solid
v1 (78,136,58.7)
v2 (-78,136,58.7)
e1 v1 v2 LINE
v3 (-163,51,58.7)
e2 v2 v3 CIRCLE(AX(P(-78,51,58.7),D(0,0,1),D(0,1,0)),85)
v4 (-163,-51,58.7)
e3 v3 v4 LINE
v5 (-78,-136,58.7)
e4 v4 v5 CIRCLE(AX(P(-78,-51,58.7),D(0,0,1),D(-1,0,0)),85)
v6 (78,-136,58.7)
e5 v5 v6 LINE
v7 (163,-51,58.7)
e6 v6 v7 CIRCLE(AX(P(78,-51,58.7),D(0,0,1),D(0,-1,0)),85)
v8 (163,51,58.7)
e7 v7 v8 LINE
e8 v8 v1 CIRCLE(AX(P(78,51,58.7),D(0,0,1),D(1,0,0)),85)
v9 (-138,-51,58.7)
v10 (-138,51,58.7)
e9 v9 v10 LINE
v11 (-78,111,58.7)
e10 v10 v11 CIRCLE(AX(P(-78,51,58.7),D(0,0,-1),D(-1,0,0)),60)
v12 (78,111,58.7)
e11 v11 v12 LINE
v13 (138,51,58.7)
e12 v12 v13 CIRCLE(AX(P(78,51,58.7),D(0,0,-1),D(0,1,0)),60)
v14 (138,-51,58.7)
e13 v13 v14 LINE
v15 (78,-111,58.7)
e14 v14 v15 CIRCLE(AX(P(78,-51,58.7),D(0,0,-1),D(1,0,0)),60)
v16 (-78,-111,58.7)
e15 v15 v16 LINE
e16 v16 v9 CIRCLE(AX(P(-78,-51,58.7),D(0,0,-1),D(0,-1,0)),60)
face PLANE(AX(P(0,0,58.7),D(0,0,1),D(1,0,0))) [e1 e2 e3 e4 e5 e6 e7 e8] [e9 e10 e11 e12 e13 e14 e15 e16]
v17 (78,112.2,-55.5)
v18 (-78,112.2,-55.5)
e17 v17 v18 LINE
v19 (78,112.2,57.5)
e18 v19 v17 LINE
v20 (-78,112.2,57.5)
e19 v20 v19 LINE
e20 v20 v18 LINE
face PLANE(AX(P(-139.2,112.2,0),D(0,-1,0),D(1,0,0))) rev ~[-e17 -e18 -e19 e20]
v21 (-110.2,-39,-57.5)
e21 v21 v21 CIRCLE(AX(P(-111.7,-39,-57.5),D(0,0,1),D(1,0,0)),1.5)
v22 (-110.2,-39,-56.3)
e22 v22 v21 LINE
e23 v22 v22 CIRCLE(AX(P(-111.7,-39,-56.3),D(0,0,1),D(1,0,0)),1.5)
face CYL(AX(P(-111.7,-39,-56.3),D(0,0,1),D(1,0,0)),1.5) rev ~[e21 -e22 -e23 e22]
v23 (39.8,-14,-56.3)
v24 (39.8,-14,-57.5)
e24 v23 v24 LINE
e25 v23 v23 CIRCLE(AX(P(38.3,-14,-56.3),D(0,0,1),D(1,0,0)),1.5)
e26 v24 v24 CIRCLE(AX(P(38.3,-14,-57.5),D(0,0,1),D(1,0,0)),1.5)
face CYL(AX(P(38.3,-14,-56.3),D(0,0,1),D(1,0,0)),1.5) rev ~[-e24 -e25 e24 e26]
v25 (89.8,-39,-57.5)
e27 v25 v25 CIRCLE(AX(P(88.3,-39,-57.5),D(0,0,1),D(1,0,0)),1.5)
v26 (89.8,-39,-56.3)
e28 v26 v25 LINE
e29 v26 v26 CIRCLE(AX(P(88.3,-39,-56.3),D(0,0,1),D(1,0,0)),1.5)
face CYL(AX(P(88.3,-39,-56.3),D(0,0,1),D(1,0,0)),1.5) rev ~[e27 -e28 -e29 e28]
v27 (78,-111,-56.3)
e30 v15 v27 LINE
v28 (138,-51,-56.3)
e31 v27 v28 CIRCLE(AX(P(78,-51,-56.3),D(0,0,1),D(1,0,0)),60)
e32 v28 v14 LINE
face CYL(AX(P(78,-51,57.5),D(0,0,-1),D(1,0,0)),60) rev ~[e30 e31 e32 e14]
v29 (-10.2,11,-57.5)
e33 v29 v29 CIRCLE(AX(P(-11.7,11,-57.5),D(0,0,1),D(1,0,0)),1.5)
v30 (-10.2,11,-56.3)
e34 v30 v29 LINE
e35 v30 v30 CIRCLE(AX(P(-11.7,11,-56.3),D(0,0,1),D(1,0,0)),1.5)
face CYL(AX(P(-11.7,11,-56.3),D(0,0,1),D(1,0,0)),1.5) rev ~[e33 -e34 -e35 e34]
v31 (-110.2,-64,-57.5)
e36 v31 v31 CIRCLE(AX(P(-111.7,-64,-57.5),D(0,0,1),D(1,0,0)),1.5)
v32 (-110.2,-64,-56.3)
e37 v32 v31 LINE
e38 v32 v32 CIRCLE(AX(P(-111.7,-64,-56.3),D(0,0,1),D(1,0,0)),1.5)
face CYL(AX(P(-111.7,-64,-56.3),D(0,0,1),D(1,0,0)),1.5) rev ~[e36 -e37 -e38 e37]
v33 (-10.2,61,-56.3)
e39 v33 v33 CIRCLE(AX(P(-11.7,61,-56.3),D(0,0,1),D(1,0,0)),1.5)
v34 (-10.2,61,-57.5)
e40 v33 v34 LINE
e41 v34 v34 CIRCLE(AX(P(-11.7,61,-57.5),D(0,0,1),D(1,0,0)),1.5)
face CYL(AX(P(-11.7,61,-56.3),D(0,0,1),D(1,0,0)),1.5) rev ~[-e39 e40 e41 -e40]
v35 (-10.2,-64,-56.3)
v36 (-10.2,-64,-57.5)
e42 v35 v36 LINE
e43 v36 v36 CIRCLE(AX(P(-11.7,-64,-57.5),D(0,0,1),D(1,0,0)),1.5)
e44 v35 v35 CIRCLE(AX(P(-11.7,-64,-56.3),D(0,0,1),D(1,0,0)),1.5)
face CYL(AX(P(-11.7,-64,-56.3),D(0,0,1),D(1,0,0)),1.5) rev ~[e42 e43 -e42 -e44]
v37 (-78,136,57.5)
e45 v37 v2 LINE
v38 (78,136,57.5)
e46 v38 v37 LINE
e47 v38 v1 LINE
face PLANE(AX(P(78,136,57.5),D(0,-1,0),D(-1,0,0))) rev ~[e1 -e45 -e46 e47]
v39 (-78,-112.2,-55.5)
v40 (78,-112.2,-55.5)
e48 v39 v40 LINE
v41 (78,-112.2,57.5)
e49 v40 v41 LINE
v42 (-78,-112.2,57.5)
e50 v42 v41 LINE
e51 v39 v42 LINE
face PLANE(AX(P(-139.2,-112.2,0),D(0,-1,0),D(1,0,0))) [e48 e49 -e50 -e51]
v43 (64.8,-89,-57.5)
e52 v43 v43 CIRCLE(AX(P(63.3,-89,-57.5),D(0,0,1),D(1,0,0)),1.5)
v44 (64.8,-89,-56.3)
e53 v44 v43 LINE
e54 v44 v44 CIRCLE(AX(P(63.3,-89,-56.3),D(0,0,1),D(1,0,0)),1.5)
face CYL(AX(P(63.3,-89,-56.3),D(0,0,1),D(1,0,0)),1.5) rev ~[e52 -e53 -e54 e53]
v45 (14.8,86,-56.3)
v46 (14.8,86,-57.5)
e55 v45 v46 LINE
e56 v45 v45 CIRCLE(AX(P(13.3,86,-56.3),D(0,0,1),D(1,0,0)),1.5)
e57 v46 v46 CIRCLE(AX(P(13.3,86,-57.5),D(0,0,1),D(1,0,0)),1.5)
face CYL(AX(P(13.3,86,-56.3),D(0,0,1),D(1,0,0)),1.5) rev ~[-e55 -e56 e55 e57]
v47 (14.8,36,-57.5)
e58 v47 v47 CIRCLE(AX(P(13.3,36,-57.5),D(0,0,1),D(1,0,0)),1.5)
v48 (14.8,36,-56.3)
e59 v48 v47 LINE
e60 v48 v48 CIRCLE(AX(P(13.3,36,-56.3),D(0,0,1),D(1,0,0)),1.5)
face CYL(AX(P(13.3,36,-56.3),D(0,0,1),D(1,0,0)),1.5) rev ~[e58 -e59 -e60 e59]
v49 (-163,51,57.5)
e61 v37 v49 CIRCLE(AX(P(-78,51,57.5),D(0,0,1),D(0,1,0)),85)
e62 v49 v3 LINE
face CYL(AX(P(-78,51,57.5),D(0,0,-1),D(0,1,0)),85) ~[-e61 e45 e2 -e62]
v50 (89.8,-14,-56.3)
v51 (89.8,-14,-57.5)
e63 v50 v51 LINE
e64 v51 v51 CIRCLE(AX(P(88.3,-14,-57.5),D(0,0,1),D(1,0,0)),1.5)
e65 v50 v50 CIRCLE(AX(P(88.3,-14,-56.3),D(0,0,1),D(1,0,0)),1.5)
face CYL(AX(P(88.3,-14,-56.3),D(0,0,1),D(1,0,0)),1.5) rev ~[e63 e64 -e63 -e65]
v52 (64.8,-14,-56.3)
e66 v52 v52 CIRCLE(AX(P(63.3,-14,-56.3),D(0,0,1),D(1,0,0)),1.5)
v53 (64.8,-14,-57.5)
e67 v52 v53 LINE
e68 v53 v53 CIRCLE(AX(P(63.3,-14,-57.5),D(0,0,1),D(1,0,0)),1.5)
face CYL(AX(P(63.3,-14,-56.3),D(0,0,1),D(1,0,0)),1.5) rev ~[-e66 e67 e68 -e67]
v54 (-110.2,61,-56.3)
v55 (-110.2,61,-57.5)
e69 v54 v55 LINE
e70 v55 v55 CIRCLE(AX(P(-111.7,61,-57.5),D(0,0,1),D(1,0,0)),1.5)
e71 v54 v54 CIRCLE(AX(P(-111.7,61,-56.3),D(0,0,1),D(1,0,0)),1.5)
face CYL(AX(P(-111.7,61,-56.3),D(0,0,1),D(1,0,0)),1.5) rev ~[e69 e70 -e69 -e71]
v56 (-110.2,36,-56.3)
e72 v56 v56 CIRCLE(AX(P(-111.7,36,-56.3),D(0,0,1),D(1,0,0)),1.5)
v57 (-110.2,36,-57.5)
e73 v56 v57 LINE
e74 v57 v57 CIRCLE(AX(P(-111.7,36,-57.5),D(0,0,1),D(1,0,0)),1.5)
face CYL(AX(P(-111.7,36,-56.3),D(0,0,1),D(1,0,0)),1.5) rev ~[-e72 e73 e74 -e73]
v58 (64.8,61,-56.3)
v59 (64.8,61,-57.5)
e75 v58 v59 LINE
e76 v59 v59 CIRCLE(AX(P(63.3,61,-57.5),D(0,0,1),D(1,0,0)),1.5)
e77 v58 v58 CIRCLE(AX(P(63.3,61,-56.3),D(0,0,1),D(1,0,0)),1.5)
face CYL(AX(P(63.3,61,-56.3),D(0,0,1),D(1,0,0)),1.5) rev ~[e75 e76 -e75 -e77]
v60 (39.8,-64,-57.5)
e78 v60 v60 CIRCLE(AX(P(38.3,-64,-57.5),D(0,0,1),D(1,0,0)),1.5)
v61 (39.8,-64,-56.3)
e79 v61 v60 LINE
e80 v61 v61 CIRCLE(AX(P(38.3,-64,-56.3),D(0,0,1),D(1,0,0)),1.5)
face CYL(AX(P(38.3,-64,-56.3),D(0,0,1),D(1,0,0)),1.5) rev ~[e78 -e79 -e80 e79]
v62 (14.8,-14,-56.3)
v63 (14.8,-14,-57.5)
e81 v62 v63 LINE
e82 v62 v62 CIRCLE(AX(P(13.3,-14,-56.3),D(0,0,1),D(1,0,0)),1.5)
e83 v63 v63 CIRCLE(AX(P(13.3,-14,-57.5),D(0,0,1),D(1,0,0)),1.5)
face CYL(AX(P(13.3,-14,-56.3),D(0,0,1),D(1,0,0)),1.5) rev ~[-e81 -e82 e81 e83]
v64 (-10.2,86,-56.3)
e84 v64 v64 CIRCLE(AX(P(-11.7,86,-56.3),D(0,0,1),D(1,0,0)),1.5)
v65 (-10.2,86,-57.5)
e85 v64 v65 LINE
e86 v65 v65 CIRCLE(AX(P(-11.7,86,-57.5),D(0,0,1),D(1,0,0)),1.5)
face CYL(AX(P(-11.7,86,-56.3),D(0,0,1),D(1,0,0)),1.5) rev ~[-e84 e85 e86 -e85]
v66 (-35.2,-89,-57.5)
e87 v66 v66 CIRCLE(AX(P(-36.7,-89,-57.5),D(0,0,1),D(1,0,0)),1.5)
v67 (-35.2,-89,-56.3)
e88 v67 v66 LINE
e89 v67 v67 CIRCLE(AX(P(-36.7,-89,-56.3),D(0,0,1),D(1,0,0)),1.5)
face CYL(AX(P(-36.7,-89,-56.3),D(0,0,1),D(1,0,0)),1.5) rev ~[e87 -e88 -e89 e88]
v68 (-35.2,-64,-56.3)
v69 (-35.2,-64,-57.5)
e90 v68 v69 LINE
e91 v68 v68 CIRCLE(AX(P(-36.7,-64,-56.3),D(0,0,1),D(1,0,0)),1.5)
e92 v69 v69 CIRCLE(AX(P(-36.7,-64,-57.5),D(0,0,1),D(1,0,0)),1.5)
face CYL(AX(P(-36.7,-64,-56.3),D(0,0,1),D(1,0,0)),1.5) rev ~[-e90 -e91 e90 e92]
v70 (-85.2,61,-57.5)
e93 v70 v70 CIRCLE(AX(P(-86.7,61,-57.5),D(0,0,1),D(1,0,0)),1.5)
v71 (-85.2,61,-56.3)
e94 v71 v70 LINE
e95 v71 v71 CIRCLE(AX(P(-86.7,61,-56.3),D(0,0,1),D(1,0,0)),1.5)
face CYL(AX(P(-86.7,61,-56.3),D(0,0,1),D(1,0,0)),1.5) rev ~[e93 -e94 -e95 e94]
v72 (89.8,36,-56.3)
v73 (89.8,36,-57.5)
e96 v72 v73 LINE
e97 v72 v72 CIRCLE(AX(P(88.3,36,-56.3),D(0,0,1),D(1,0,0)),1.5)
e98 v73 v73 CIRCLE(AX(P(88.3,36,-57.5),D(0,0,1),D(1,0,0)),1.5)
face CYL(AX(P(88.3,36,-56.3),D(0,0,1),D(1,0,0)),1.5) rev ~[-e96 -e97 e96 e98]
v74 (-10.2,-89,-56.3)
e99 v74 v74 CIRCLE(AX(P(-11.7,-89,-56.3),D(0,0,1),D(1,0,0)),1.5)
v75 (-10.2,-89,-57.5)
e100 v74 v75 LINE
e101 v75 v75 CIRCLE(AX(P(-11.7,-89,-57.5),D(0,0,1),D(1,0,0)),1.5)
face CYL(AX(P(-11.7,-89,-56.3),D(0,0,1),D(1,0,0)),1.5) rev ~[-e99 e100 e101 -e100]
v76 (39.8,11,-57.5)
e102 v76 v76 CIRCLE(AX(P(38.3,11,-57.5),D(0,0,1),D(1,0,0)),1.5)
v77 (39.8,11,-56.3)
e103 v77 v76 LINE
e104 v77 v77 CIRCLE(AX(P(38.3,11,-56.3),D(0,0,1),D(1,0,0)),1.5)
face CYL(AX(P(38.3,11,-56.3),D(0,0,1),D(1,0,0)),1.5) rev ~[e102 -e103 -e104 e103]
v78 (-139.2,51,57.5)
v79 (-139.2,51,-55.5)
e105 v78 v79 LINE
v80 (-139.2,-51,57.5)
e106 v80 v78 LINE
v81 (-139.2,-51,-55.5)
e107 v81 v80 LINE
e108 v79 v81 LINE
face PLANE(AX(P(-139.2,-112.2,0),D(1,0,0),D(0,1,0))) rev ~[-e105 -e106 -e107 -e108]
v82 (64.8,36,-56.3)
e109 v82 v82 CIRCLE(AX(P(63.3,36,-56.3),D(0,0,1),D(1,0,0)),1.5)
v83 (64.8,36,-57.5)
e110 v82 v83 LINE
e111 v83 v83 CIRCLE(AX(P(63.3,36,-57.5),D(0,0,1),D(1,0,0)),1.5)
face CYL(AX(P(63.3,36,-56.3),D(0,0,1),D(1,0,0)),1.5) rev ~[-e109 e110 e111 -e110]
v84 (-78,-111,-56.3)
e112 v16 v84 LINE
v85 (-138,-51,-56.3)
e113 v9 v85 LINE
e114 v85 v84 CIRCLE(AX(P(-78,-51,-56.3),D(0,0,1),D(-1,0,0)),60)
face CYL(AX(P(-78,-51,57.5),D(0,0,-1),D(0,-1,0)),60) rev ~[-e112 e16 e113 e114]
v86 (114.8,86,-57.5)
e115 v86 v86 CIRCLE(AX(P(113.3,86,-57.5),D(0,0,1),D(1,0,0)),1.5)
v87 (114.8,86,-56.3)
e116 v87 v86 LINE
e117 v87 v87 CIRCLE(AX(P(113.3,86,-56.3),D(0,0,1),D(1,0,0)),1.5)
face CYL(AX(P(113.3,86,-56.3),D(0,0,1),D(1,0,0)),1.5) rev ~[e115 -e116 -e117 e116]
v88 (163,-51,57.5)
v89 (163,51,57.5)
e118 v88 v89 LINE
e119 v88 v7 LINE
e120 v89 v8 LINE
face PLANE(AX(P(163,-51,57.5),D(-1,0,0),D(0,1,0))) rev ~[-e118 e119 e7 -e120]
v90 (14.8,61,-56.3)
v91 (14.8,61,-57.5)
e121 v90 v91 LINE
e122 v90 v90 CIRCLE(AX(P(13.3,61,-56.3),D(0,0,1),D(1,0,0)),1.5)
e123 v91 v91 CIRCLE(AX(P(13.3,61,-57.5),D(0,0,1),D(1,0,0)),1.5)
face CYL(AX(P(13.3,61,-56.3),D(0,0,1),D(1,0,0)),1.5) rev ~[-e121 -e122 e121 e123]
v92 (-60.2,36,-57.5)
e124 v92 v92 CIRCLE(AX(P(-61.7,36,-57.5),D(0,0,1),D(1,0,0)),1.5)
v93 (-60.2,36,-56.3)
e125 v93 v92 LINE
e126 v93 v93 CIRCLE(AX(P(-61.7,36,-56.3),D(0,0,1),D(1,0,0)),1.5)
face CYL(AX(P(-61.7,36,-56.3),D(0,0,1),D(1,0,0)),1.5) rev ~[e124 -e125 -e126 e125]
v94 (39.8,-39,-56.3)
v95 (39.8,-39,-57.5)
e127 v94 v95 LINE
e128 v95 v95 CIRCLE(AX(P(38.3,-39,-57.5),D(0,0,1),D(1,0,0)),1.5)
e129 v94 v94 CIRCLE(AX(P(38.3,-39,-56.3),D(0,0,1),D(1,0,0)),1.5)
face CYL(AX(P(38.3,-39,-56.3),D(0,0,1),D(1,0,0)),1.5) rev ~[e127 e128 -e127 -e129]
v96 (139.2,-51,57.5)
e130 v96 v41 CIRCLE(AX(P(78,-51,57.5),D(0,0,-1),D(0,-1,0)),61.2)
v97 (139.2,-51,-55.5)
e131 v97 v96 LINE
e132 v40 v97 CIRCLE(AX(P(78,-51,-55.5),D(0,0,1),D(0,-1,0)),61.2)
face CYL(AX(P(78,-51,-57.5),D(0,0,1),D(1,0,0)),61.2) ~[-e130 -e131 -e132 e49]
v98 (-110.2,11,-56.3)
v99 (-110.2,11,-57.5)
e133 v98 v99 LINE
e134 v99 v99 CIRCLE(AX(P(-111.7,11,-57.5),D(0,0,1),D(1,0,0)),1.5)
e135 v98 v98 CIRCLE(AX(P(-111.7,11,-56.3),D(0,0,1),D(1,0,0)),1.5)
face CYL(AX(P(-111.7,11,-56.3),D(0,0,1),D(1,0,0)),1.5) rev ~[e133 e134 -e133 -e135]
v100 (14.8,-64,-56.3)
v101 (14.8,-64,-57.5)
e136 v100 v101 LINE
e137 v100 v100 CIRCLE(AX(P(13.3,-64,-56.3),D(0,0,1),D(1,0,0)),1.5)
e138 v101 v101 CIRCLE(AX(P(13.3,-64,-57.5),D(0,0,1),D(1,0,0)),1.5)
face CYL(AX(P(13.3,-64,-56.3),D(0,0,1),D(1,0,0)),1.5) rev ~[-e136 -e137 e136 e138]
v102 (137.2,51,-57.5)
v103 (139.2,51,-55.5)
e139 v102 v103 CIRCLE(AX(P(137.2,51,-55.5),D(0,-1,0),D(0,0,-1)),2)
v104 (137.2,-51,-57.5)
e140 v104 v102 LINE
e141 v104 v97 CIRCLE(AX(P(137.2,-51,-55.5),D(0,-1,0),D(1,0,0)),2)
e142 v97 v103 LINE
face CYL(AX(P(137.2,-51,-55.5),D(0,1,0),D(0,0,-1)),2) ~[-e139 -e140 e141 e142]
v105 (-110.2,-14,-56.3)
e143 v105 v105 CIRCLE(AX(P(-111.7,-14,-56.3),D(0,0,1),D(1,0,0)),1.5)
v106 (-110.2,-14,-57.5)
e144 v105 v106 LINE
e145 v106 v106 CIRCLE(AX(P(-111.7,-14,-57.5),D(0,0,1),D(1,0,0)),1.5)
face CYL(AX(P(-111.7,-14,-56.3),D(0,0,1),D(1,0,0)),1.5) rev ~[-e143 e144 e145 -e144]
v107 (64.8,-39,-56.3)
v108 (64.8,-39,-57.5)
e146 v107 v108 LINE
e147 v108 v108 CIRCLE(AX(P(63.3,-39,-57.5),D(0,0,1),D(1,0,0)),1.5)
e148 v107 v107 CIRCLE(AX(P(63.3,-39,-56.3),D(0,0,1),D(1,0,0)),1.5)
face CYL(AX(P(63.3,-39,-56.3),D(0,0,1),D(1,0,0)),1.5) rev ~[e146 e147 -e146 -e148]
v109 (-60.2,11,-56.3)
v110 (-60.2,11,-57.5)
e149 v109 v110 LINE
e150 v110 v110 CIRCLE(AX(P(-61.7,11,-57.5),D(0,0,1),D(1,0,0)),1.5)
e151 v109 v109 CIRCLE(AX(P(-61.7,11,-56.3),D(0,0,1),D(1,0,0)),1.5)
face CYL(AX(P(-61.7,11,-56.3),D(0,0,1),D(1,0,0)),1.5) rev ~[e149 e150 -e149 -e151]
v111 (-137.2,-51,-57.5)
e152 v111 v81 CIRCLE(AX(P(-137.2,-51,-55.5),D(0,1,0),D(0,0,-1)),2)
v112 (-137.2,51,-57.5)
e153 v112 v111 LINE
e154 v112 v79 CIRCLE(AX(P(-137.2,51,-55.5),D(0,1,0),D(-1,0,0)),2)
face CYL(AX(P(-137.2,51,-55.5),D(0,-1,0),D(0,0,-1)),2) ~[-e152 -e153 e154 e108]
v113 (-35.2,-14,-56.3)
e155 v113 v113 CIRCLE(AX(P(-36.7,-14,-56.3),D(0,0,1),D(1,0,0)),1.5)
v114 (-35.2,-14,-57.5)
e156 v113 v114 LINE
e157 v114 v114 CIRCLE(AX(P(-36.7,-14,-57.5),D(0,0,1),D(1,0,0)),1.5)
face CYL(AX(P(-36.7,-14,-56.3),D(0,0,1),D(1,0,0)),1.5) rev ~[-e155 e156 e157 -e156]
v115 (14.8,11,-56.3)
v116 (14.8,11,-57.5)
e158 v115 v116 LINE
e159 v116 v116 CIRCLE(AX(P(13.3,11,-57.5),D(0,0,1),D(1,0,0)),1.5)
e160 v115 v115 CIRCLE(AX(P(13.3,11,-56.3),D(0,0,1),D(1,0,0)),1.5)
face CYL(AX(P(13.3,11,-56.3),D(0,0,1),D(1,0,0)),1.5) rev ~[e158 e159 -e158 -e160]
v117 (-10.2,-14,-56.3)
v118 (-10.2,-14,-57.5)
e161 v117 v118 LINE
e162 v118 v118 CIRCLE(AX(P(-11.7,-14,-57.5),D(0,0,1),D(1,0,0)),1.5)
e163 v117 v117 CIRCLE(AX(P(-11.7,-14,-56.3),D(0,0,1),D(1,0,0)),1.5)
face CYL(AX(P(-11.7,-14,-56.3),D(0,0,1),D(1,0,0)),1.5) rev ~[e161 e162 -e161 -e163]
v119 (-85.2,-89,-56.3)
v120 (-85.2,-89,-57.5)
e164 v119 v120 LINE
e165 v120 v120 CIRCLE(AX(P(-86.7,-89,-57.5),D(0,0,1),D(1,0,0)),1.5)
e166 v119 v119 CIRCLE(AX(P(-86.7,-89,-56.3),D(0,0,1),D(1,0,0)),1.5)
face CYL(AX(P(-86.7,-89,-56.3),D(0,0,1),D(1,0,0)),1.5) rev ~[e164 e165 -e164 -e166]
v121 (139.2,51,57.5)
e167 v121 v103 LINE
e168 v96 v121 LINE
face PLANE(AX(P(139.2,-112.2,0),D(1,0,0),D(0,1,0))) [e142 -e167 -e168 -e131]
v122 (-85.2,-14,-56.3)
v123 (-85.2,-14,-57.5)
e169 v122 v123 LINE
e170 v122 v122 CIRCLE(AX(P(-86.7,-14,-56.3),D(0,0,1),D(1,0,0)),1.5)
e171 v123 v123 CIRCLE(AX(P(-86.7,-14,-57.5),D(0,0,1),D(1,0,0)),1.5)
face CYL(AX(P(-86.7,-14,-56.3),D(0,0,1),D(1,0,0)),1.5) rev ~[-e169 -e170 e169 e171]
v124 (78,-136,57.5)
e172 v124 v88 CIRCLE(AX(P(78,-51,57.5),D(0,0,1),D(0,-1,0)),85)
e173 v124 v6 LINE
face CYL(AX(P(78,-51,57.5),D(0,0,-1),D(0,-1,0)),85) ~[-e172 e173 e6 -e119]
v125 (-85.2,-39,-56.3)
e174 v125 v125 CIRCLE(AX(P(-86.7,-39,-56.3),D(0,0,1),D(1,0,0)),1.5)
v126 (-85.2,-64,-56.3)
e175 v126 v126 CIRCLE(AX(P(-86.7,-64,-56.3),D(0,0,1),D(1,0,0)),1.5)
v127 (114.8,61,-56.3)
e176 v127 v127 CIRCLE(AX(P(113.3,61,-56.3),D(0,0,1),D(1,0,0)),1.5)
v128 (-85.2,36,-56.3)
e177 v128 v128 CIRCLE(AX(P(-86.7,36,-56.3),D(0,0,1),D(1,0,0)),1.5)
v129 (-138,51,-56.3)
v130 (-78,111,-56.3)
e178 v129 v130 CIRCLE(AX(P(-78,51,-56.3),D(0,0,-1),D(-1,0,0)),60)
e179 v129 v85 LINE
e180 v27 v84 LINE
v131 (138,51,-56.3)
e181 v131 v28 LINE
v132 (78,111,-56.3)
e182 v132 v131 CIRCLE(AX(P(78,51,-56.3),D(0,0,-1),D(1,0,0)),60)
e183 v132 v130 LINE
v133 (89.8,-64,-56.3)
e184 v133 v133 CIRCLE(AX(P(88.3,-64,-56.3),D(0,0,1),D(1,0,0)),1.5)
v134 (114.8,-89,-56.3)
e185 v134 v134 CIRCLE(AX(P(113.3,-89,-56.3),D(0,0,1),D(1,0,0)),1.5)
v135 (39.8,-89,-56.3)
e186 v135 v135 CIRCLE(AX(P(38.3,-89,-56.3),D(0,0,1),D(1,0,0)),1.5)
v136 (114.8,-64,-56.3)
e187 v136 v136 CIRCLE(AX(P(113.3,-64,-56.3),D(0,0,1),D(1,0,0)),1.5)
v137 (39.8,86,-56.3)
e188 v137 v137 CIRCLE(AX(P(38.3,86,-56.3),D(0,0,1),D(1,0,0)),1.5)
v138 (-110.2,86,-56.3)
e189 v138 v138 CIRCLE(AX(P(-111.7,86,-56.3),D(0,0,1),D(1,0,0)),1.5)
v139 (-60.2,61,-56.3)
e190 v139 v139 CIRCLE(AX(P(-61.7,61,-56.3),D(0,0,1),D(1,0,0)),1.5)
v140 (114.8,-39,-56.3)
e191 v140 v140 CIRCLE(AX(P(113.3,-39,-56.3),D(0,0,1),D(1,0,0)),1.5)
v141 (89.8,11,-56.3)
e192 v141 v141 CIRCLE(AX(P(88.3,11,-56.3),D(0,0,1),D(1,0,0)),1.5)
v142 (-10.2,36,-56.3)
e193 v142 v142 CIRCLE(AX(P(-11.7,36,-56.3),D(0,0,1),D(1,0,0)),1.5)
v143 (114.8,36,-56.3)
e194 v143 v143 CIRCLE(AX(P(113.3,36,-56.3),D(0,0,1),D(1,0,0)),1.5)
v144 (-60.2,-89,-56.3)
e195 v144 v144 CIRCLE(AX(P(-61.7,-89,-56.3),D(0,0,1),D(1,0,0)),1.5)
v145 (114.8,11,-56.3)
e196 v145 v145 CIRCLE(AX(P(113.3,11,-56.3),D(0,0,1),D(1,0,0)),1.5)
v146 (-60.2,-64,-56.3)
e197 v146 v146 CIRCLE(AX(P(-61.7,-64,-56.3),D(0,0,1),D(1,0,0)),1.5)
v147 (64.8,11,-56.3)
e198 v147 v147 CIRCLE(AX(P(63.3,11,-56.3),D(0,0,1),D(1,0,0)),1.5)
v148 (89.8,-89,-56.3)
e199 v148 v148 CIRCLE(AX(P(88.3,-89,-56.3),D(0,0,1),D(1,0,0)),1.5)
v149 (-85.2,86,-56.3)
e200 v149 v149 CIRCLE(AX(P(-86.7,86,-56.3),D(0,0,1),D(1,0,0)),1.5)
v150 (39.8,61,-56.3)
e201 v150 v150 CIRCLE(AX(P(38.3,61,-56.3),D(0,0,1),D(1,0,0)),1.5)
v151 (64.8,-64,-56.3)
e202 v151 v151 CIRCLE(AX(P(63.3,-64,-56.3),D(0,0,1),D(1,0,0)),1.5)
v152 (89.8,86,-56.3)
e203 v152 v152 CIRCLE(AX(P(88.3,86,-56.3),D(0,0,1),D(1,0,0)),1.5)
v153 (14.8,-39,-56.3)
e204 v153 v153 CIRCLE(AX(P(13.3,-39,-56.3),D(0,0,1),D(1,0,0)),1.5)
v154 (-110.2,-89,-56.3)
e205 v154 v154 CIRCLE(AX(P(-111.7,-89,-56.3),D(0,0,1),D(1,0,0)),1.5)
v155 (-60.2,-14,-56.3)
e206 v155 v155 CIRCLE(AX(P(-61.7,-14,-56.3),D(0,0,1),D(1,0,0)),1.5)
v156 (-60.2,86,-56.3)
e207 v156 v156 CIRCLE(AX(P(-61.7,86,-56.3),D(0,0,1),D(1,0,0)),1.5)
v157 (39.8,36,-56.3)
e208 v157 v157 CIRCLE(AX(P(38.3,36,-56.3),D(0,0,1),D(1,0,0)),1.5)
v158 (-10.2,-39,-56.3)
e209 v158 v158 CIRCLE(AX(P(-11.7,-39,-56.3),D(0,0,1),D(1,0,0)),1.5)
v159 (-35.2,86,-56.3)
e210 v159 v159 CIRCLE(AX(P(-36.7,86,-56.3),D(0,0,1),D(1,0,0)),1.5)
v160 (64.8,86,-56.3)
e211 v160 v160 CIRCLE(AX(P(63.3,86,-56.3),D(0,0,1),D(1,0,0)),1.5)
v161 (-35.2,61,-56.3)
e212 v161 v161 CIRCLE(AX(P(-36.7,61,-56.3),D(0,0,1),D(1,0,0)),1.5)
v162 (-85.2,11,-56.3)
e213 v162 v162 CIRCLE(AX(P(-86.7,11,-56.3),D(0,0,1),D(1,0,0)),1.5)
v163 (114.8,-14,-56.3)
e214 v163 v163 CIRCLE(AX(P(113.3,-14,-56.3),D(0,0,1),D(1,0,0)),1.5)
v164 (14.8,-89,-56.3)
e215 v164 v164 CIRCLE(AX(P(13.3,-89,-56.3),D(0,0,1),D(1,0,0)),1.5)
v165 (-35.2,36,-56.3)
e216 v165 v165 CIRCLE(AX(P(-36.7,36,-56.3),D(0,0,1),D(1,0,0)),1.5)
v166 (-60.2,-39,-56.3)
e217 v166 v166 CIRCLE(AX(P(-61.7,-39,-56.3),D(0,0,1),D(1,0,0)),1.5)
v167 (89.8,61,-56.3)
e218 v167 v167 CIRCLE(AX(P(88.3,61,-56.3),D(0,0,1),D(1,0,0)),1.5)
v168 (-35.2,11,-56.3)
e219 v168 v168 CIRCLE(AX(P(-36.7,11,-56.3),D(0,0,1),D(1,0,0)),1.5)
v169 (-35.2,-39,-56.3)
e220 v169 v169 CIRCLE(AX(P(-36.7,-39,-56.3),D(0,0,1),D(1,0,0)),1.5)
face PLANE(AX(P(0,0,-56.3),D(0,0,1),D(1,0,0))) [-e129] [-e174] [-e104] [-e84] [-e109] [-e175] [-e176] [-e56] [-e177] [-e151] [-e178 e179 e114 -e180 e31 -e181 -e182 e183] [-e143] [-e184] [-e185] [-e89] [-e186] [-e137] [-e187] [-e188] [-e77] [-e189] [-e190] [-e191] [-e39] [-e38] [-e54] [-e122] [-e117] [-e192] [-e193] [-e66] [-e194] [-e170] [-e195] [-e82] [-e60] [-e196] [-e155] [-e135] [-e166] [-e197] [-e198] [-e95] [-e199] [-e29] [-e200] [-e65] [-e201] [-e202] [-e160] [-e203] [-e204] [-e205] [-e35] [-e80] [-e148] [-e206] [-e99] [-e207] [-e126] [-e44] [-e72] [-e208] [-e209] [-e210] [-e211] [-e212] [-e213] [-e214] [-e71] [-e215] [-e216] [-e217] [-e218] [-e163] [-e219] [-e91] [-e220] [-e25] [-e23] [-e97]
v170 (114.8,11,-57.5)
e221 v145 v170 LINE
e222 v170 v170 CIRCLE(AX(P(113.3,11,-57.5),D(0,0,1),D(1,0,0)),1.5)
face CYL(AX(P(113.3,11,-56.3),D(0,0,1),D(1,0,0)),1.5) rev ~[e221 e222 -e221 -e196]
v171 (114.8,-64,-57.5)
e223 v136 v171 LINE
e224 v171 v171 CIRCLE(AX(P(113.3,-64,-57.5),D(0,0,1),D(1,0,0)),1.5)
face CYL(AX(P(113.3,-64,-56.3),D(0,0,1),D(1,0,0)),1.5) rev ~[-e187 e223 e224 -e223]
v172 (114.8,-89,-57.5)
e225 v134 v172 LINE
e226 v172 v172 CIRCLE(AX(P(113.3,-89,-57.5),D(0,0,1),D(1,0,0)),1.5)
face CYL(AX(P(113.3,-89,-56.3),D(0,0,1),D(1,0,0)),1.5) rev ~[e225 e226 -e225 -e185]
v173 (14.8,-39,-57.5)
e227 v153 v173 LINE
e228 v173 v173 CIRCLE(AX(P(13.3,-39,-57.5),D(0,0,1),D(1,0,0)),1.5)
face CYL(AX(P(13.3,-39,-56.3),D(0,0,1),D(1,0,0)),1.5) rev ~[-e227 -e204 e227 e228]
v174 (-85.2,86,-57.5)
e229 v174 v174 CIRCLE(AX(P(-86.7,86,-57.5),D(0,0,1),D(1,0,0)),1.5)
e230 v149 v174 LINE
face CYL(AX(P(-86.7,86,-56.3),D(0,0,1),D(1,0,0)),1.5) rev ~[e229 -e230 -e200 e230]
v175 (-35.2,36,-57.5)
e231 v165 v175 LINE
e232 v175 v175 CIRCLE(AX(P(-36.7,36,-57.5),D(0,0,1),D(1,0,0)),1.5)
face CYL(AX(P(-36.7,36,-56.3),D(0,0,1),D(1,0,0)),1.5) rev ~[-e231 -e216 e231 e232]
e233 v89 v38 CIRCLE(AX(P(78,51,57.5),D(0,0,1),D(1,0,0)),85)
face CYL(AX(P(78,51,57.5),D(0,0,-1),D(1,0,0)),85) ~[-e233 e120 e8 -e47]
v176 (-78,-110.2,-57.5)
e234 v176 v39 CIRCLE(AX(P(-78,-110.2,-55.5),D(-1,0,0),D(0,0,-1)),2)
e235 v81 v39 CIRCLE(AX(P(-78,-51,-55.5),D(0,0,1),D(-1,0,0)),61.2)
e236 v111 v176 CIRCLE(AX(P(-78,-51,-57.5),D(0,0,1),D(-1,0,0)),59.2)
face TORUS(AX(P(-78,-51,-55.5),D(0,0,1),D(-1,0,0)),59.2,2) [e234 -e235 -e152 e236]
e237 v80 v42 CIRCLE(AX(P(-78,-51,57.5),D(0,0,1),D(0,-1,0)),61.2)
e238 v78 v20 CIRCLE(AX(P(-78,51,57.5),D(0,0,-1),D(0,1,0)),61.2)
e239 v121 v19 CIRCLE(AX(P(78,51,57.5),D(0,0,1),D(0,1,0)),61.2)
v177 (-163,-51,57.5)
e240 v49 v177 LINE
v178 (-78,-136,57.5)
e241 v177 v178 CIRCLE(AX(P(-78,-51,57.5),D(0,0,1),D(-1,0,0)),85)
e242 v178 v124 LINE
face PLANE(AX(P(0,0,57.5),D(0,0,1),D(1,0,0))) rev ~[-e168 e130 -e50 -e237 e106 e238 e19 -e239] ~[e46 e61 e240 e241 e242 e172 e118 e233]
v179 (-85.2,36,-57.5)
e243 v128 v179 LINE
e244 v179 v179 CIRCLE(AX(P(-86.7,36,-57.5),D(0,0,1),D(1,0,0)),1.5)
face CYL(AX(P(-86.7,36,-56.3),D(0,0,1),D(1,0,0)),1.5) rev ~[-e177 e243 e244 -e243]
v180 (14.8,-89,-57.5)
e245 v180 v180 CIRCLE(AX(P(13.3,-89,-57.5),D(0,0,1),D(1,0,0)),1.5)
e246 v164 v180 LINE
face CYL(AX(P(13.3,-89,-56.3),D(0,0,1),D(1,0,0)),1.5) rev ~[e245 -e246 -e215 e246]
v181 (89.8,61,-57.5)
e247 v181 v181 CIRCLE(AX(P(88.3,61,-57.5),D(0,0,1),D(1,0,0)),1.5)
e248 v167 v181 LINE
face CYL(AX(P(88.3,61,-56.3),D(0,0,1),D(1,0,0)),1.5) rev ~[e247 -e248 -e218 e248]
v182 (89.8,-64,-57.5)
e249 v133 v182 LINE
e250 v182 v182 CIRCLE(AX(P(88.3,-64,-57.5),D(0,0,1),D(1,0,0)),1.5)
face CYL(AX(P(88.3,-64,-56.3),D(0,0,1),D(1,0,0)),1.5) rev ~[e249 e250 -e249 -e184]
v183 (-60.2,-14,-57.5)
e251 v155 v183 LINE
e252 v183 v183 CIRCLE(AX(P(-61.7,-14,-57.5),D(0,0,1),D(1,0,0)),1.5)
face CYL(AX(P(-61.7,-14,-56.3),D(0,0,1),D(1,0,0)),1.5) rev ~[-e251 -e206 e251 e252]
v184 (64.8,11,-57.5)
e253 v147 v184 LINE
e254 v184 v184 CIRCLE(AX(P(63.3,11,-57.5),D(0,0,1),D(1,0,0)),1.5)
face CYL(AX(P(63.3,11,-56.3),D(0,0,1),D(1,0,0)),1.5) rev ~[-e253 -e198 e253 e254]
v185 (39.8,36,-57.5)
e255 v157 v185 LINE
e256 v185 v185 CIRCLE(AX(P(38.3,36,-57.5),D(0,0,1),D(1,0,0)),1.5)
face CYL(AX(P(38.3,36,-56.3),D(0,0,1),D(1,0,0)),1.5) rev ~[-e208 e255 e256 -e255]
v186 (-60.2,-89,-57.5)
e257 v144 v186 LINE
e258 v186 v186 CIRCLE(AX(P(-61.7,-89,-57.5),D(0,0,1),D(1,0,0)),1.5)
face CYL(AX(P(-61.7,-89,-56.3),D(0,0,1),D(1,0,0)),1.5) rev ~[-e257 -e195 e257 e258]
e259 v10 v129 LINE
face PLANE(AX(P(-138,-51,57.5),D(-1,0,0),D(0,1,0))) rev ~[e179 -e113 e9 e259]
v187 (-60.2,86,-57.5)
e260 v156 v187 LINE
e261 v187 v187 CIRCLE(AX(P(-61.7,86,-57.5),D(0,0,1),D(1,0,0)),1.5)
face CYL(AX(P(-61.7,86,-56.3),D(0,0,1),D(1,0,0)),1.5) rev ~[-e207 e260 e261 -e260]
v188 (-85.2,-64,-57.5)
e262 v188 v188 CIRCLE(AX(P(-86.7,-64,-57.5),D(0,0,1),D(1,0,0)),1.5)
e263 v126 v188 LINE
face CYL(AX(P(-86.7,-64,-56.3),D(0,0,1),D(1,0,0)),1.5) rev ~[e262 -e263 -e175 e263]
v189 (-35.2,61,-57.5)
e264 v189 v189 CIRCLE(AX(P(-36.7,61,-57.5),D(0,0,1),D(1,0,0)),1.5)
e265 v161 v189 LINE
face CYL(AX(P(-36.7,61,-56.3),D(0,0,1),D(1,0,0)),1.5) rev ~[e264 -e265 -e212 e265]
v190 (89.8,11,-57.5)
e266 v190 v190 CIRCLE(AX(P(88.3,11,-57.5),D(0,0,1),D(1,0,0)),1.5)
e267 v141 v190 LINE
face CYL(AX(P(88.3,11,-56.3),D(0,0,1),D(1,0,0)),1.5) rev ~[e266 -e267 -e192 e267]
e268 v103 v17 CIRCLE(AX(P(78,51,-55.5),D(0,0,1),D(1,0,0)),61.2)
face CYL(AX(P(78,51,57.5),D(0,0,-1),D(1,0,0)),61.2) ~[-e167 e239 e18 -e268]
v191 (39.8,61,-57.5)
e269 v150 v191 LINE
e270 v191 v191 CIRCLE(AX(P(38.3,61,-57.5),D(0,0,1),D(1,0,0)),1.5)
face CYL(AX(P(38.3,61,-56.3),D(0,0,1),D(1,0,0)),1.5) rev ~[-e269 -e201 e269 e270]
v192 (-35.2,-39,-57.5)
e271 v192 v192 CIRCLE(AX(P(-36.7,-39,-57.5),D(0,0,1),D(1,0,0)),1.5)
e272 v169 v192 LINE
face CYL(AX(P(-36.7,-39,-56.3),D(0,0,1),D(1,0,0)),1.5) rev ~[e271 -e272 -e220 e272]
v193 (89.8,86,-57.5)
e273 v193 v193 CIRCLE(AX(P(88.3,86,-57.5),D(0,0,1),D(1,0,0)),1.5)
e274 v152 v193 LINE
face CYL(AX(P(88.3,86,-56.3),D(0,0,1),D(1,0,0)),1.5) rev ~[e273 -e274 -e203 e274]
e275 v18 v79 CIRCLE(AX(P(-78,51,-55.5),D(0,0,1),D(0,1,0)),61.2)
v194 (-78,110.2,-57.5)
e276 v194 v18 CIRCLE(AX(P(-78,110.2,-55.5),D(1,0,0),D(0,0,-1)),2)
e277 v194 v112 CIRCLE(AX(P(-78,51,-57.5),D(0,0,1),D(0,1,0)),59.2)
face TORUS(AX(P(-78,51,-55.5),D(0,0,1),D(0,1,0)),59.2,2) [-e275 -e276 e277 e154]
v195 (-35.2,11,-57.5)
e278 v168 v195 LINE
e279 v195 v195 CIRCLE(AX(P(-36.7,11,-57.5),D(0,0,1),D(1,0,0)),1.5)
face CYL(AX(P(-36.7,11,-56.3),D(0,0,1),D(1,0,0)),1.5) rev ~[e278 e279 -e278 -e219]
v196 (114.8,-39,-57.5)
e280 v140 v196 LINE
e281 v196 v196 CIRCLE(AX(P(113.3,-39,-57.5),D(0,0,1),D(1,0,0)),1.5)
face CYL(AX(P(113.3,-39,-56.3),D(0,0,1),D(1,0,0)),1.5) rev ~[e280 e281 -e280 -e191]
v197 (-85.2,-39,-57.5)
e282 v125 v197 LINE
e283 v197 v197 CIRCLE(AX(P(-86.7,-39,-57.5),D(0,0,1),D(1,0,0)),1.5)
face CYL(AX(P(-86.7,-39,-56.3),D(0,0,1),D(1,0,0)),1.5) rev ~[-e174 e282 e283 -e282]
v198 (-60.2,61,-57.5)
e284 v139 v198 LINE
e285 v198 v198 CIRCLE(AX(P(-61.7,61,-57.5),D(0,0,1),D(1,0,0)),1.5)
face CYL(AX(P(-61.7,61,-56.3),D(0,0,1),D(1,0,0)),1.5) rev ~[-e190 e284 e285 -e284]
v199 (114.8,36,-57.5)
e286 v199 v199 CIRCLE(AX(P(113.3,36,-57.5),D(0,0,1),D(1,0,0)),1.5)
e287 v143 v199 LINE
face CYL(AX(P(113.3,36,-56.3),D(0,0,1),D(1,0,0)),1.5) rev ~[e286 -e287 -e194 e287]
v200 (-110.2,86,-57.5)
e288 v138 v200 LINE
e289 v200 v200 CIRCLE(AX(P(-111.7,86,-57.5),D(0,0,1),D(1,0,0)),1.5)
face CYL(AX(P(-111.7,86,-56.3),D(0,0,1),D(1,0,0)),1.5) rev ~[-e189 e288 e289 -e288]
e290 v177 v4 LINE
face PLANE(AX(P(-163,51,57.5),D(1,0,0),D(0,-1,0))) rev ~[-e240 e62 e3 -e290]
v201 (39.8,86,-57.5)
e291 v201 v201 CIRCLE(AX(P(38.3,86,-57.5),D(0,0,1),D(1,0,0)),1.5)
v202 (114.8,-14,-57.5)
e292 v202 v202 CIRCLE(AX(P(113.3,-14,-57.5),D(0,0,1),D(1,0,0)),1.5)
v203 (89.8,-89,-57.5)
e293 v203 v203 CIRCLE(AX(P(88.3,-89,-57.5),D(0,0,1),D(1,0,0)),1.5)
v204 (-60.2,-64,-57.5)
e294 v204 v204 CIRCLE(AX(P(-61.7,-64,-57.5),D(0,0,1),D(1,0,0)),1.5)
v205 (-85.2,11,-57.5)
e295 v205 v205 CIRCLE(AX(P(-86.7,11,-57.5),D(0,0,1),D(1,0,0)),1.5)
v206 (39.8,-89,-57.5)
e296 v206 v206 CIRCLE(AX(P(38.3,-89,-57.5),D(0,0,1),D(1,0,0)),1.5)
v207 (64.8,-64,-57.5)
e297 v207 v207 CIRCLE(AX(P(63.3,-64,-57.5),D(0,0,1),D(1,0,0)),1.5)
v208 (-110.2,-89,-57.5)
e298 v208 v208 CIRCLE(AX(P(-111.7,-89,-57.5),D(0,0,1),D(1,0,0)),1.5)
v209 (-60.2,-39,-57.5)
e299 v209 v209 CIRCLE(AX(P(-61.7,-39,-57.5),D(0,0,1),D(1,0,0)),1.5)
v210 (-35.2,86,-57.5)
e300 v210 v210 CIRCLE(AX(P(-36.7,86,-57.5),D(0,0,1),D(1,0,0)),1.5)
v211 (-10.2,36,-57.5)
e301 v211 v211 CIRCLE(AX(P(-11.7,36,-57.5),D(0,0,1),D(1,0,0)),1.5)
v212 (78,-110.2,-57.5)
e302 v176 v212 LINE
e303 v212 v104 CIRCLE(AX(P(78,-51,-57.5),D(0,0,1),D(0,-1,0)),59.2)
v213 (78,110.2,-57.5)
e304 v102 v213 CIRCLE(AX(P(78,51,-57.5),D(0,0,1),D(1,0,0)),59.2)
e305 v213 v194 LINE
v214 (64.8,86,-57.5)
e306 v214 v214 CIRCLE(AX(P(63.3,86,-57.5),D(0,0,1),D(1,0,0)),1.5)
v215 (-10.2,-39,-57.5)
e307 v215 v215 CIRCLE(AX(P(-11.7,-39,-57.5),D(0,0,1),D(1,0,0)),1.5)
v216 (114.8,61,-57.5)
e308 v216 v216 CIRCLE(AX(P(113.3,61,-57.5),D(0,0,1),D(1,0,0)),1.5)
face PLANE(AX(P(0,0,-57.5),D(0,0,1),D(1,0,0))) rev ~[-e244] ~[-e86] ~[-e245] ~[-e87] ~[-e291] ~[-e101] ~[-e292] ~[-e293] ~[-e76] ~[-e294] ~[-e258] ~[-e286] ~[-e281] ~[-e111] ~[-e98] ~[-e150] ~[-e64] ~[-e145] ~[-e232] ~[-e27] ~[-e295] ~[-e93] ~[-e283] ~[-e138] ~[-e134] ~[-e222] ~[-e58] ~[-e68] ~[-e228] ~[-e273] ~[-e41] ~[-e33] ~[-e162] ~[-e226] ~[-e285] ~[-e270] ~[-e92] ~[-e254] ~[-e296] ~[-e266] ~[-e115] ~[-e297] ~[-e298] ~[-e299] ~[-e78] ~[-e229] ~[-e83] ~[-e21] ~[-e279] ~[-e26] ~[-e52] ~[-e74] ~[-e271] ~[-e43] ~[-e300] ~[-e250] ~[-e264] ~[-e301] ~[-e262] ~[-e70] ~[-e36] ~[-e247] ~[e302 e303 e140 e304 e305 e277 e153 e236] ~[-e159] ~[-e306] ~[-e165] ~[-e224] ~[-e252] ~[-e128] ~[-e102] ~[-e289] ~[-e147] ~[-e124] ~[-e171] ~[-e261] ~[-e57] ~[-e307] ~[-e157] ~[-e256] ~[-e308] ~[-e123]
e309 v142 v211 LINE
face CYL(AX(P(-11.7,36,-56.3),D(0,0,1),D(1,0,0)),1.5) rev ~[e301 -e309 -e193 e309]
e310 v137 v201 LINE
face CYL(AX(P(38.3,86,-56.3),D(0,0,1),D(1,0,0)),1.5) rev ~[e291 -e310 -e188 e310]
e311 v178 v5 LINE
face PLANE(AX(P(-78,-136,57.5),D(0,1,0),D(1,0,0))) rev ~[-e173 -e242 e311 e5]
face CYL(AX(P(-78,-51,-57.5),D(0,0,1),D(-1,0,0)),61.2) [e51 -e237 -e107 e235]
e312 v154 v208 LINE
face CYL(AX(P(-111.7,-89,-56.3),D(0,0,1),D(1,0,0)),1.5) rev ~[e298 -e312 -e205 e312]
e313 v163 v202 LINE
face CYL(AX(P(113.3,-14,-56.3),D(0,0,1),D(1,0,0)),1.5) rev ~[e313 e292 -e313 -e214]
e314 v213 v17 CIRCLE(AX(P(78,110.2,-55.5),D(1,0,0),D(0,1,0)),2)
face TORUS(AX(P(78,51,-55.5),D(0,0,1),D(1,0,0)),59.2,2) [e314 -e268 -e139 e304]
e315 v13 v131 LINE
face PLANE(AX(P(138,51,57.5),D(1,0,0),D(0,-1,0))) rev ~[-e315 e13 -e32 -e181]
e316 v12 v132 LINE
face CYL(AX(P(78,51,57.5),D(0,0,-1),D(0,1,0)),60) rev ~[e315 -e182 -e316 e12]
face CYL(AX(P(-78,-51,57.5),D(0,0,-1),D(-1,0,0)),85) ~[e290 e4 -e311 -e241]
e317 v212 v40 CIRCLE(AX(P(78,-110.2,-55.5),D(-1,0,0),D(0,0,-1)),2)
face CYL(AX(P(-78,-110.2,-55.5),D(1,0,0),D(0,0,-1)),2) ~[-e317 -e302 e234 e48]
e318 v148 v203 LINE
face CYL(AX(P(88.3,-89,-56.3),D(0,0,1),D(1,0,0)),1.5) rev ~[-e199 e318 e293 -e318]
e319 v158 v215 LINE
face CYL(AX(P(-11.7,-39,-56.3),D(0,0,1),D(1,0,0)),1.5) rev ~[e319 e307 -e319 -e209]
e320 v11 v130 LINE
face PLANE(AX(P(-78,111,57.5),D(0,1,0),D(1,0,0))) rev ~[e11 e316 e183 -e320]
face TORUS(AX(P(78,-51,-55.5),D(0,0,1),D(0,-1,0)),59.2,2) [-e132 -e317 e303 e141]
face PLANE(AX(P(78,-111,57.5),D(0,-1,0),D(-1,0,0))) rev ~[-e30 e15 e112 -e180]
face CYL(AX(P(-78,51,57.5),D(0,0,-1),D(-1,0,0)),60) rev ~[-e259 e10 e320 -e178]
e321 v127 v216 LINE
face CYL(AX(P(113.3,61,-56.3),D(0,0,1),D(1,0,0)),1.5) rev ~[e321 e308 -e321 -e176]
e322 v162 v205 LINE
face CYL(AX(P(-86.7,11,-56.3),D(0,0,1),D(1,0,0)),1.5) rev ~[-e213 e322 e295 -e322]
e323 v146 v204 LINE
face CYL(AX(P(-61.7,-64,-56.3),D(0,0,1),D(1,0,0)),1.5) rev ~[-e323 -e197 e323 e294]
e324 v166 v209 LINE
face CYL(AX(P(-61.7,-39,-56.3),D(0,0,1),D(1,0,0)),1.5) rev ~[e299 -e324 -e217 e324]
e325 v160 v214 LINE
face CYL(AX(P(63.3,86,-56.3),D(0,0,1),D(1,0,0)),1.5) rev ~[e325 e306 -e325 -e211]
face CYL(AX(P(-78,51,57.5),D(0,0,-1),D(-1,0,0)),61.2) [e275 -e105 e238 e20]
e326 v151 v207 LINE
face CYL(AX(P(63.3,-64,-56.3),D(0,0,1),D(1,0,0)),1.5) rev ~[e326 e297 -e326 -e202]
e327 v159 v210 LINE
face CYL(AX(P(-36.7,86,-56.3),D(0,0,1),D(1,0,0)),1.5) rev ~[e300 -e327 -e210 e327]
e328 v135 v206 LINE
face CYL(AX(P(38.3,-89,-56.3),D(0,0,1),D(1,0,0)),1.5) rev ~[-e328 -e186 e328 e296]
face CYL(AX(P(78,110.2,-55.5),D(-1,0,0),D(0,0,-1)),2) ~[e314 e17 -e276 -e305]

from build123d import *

# Parameters (mm, degrees)
F0_W     = 278.4
F0_H     = 224.4
F1_DEPTH = 57.5
F2_R     = 61.2
F3_T     = -1.2
F5_DEPTH = 1.2
F6_R     = 2
F7_R     = 1.5
F8_DEPTH = 1.2


# Not quite as in the source:
# - a feature names something its author has since deleted; it is built from what else it names


with BuildPart() as f1:
    # F0 (on Top) → F1 (new body, symmetric)
    with BuildSketch(Plane.XY):
        Rectangle(F0_W, F0_H)
    extrude(amount=F1_DEPTH, both=True)

    # F2
    f2_edges = [f1.edges().sort_by_distance(p)[0] for p in [
        (-139.2, -112.2, 0),
        (139.2, -112.2, 0),
        (139.2, 112.2, 0),
        (-139.2, 112.2, 0),
    ]]
    fillet(f2_edges, radius=F2_R)

    # F3
    f3_openings = [f1.faces().sort_by_distance(p)[0] for p in [
        (0, 0, 57.5),
    ]]
    offset(amount=F3_T, openings=f3_openings)

    # F4 (on face) → F5 (join)
    with BuildSketch(Plane.XY.offset(57.5)):
        with BuildLine():
            ThreePointArc((-163, -51), (-138.1040764009, -111.1040764009), (-78, -136))
            Line((-78, -136), (78, -136))
            ThreePointArc((78, -136), (138.1040764009, -111.1040764009), (163, -51))
            Line((163, -51), (163, 51))
            ThreePointArc((163, 51), (138.1040764009, 111.1040764009), (78, 136))
            Line((78, 136), (-78, 136))
            ThreePointArc((-78, 136), (-138.1040764009, 111.1040764009), (-163, 51))
            Line((-163, 51), (-163, -51))
        make_face()
        with BuildLine():
            ThreePointArc((138, -51), (120.4264068712, -93.4264068712), (78, -111))
            Line((78, -111), (-78, -111))
            ThreePointArc((-78, -111), (-120.4264068712, -93.4264068712), (-138, -51))
            Line((-138, -51), (-138, 51))
            ThreePointArc((-138, 51), (-120.4264068712, 93.4264068712), (-78, 111))
            Line((-78, 111), (78, 111))
            ThreePointArc((78, 111), (120.4264068712, 93.4264068712), (138, 51))
            Line((138, 51), (138, -51))
        make_face(mode=Mode.SUBTRACT)
    extrude(amount=F5_DEPTH)

    # F6
    f6_edges = [f1.edges().sort_by_distance(p)[0] for p in [
        (0, -112.2, -57.5),
        (139.2, 0, -57.5),
        (0, 112.2, -57.5),
        (-139.2, 0, -57.5),
        (-121.274935, -94.274935, -57.5),
        (-121.274935, 94.274935, -57.5),
        (121.274935, 94.274935, -57.5),
        (121.274935, -94.274935, -57.5),
    ]]
    fillet(f6_edges, radius=F6_R)

    # F7 (on face) → F8 (cut, through all)
    with BuildSketch(Plane.XY.offset(-56.3)):
        with Locations((-111.7, 86)):
            Circle(F7_R)
        with Locations((-111.7, 61)):
            Circle(F7_R)
        with Locations((-111.7, 36)):
            Circle(F7_R)
        with Locations((-111.7, 11)):
            Circle(F7_R)
        with Locations((-111.7, -14)):
            Circle(F7_R)
        with Locations((-111.7, -39)):
            Circle(F7_R)
        with Locations((-111.7, -64)):
            Circle(F7_R)
        with Locations((-111.7, -89)):
            Circle(F7_R)
        with Locations((-86.7, 86)):
            Circle(F7_R)
        with Locations((-86.7, 61)):
            Circle(F7_R)
        with Locations((-86.7, 36)):
            Circle(F7_R)
        with Locations((-86.7, 11)):
            Circle(F7_R)
        with Locations((-86.7, -14)):
            Circle(F7_R)
        with Locations((-86.7, -39)):
            Circle(F7_R)
        with Locations((-86.7, -64)):
            Circle(F7_R)
        with Locations((-86.7, -89)):
            Circle(F7_R)
        with Locations((-61.7, 86)):
            Circle(F7_R)
        with Locations((-61.7, 61)):
            Circle(F7_R)
        with Locations((-61.7, 36)):
            Circle(F7_R)
        with Locations((-61.7, 11)):
            Circle(F7_R)
        with Locations((-61.7, -14)):
            Circle(F7_R)
        with Locations((-61.7, -39)):
            Circle(F7_R)
        with Locations((-61.7, -64)):
            Circle(F7_R)
        with Locations((-61.7, -89)):
            Circle(F7_R)
        with Locations((-36.7, 86)):
            Circle(F7_R)
        with Locations((-36.7, 61)):
            Circle(F7_R)
        with Locations((-36.7, 36)):
            Circle(F7_R)
        with Locations((-36.7, 11)):
            Circle(F7_R)
        with Locations((-36.7, -14)):
            Circle(F7_R)
        with Locations((-36.7, -39)):
            Circle(F7_R)
        with Locations((-36.7, -64)):
            Circle(F7_R)
        with Locations((-36.7, -89)):
            Circle(F7_R)
        with Locations((-11.7, 86)):
            Circle(F7_R)
        with Locations((-11.7, 61)):
            Circle(F7_R)
        with Locations((-11.7, 36)):
            Circle(F7_R)
        with Locations((-11.7, 11)):
            Circle(F7_R)
        with Locations((-11.7, -14)):
            Circle(F7_R)
        with Locations((-11.7, -39)):
            Circle(F7_R)
        with Locations((-11.7, -64)):
            Circle(F7_R)
        with Locations((-11.7, -89)):
            Circle(F7_R)
        with Locations((13.3, 86)):
            Circle(F7_R)
        with Locations((13.3, 61)):
            Circle(F7_R)
        with Locations((13.3, 36)):
            Circle(F7_R)
        with Locations((13.3, 11)):
            Circle(F7_R)
        with Locations((13.3, -14)):
            Circle(F7_R)
        with Locations((13.3, -39)):
            Circle(F7_R)
        with Locations((13.3, -64)):
            Circle(F7_R)
        with Locations((13.3, -89)):
            Circle(F7_R)
        with Locations((38.3, 86)):
            Circle(F7_R)
        with Locations((38.3, 61)):
            Circle(F7_R)
        with Locations((38.3, 36)):
            Circle(F7_R)
        with Locations((38.3, 11)):
            Circle(F7_R)
        with Locations((38.3, -14)):
            Circle(F7_R)
        with Locations((38.3, -39)):
            Circle(F7_R)
        with Locations((38.3, -64)):
            Circle(F7_R)
        with Locations((38.3, -89)):
            Circle(F7_R)
        with Locations((63.3, 86)):
            Circle(F7_R)
        with Locations((63.3, 61)):
            Circle(F7_R)
        with Locations((63.3, 36)):
            Circle(F7_R)
        with Locations((63.3, 11)):
            Circle(F7_R)
        with Locations((63.3, -14)):
            Circle(F7_R)
        with Locations((63.3, -39)):
            Circle(F7_R)
        with Locations((63.3, -64)):
            Circle(F7_R)
        with Locations((63.3, -89)):
            Circle(F7_R)
        with Locations((88.3, 86)):
            Circle(F7_R)
        with Locations((88.3, 61)):
            Circle(F7_R)
        with Locations((88.3, 36)):
            Circle(F7_R)
        with Locations((88.3, 11)):
            Circle(F7_R)
        with Locations((88.3, -14)):
            Circle(F7_R)
        with Locations((88.3, -39)):
            Circle(F7_R)
        with Locations((88.3, -64)):
            Circle(F7_R)
        with Locations((88.3, -89)):
            Circle(F7_R)
        with Locations((113.3, 86)):
            Circle(F7_R)
        with Locations((113.3, 61)):
            Circle(F7_R)
        with Locations((113.3, 36)):
            Circle(F7_R)
        with Locations((113.3, 11)):
            Circle(F7_R)
        with Locations((113.3, -14)):
            Circle(F7_R)
        with Locations((113.3, -39)):
            Circle(F7_R)
        with Locations((113.3, -64)):
            Circle(F7_R)
        with Locations((113.3, -89)):
            Circle(F7_R)
    extrude(amount=-F8_DEPTH, mode=Mode.SUBTRACT)


solid = f1.part
